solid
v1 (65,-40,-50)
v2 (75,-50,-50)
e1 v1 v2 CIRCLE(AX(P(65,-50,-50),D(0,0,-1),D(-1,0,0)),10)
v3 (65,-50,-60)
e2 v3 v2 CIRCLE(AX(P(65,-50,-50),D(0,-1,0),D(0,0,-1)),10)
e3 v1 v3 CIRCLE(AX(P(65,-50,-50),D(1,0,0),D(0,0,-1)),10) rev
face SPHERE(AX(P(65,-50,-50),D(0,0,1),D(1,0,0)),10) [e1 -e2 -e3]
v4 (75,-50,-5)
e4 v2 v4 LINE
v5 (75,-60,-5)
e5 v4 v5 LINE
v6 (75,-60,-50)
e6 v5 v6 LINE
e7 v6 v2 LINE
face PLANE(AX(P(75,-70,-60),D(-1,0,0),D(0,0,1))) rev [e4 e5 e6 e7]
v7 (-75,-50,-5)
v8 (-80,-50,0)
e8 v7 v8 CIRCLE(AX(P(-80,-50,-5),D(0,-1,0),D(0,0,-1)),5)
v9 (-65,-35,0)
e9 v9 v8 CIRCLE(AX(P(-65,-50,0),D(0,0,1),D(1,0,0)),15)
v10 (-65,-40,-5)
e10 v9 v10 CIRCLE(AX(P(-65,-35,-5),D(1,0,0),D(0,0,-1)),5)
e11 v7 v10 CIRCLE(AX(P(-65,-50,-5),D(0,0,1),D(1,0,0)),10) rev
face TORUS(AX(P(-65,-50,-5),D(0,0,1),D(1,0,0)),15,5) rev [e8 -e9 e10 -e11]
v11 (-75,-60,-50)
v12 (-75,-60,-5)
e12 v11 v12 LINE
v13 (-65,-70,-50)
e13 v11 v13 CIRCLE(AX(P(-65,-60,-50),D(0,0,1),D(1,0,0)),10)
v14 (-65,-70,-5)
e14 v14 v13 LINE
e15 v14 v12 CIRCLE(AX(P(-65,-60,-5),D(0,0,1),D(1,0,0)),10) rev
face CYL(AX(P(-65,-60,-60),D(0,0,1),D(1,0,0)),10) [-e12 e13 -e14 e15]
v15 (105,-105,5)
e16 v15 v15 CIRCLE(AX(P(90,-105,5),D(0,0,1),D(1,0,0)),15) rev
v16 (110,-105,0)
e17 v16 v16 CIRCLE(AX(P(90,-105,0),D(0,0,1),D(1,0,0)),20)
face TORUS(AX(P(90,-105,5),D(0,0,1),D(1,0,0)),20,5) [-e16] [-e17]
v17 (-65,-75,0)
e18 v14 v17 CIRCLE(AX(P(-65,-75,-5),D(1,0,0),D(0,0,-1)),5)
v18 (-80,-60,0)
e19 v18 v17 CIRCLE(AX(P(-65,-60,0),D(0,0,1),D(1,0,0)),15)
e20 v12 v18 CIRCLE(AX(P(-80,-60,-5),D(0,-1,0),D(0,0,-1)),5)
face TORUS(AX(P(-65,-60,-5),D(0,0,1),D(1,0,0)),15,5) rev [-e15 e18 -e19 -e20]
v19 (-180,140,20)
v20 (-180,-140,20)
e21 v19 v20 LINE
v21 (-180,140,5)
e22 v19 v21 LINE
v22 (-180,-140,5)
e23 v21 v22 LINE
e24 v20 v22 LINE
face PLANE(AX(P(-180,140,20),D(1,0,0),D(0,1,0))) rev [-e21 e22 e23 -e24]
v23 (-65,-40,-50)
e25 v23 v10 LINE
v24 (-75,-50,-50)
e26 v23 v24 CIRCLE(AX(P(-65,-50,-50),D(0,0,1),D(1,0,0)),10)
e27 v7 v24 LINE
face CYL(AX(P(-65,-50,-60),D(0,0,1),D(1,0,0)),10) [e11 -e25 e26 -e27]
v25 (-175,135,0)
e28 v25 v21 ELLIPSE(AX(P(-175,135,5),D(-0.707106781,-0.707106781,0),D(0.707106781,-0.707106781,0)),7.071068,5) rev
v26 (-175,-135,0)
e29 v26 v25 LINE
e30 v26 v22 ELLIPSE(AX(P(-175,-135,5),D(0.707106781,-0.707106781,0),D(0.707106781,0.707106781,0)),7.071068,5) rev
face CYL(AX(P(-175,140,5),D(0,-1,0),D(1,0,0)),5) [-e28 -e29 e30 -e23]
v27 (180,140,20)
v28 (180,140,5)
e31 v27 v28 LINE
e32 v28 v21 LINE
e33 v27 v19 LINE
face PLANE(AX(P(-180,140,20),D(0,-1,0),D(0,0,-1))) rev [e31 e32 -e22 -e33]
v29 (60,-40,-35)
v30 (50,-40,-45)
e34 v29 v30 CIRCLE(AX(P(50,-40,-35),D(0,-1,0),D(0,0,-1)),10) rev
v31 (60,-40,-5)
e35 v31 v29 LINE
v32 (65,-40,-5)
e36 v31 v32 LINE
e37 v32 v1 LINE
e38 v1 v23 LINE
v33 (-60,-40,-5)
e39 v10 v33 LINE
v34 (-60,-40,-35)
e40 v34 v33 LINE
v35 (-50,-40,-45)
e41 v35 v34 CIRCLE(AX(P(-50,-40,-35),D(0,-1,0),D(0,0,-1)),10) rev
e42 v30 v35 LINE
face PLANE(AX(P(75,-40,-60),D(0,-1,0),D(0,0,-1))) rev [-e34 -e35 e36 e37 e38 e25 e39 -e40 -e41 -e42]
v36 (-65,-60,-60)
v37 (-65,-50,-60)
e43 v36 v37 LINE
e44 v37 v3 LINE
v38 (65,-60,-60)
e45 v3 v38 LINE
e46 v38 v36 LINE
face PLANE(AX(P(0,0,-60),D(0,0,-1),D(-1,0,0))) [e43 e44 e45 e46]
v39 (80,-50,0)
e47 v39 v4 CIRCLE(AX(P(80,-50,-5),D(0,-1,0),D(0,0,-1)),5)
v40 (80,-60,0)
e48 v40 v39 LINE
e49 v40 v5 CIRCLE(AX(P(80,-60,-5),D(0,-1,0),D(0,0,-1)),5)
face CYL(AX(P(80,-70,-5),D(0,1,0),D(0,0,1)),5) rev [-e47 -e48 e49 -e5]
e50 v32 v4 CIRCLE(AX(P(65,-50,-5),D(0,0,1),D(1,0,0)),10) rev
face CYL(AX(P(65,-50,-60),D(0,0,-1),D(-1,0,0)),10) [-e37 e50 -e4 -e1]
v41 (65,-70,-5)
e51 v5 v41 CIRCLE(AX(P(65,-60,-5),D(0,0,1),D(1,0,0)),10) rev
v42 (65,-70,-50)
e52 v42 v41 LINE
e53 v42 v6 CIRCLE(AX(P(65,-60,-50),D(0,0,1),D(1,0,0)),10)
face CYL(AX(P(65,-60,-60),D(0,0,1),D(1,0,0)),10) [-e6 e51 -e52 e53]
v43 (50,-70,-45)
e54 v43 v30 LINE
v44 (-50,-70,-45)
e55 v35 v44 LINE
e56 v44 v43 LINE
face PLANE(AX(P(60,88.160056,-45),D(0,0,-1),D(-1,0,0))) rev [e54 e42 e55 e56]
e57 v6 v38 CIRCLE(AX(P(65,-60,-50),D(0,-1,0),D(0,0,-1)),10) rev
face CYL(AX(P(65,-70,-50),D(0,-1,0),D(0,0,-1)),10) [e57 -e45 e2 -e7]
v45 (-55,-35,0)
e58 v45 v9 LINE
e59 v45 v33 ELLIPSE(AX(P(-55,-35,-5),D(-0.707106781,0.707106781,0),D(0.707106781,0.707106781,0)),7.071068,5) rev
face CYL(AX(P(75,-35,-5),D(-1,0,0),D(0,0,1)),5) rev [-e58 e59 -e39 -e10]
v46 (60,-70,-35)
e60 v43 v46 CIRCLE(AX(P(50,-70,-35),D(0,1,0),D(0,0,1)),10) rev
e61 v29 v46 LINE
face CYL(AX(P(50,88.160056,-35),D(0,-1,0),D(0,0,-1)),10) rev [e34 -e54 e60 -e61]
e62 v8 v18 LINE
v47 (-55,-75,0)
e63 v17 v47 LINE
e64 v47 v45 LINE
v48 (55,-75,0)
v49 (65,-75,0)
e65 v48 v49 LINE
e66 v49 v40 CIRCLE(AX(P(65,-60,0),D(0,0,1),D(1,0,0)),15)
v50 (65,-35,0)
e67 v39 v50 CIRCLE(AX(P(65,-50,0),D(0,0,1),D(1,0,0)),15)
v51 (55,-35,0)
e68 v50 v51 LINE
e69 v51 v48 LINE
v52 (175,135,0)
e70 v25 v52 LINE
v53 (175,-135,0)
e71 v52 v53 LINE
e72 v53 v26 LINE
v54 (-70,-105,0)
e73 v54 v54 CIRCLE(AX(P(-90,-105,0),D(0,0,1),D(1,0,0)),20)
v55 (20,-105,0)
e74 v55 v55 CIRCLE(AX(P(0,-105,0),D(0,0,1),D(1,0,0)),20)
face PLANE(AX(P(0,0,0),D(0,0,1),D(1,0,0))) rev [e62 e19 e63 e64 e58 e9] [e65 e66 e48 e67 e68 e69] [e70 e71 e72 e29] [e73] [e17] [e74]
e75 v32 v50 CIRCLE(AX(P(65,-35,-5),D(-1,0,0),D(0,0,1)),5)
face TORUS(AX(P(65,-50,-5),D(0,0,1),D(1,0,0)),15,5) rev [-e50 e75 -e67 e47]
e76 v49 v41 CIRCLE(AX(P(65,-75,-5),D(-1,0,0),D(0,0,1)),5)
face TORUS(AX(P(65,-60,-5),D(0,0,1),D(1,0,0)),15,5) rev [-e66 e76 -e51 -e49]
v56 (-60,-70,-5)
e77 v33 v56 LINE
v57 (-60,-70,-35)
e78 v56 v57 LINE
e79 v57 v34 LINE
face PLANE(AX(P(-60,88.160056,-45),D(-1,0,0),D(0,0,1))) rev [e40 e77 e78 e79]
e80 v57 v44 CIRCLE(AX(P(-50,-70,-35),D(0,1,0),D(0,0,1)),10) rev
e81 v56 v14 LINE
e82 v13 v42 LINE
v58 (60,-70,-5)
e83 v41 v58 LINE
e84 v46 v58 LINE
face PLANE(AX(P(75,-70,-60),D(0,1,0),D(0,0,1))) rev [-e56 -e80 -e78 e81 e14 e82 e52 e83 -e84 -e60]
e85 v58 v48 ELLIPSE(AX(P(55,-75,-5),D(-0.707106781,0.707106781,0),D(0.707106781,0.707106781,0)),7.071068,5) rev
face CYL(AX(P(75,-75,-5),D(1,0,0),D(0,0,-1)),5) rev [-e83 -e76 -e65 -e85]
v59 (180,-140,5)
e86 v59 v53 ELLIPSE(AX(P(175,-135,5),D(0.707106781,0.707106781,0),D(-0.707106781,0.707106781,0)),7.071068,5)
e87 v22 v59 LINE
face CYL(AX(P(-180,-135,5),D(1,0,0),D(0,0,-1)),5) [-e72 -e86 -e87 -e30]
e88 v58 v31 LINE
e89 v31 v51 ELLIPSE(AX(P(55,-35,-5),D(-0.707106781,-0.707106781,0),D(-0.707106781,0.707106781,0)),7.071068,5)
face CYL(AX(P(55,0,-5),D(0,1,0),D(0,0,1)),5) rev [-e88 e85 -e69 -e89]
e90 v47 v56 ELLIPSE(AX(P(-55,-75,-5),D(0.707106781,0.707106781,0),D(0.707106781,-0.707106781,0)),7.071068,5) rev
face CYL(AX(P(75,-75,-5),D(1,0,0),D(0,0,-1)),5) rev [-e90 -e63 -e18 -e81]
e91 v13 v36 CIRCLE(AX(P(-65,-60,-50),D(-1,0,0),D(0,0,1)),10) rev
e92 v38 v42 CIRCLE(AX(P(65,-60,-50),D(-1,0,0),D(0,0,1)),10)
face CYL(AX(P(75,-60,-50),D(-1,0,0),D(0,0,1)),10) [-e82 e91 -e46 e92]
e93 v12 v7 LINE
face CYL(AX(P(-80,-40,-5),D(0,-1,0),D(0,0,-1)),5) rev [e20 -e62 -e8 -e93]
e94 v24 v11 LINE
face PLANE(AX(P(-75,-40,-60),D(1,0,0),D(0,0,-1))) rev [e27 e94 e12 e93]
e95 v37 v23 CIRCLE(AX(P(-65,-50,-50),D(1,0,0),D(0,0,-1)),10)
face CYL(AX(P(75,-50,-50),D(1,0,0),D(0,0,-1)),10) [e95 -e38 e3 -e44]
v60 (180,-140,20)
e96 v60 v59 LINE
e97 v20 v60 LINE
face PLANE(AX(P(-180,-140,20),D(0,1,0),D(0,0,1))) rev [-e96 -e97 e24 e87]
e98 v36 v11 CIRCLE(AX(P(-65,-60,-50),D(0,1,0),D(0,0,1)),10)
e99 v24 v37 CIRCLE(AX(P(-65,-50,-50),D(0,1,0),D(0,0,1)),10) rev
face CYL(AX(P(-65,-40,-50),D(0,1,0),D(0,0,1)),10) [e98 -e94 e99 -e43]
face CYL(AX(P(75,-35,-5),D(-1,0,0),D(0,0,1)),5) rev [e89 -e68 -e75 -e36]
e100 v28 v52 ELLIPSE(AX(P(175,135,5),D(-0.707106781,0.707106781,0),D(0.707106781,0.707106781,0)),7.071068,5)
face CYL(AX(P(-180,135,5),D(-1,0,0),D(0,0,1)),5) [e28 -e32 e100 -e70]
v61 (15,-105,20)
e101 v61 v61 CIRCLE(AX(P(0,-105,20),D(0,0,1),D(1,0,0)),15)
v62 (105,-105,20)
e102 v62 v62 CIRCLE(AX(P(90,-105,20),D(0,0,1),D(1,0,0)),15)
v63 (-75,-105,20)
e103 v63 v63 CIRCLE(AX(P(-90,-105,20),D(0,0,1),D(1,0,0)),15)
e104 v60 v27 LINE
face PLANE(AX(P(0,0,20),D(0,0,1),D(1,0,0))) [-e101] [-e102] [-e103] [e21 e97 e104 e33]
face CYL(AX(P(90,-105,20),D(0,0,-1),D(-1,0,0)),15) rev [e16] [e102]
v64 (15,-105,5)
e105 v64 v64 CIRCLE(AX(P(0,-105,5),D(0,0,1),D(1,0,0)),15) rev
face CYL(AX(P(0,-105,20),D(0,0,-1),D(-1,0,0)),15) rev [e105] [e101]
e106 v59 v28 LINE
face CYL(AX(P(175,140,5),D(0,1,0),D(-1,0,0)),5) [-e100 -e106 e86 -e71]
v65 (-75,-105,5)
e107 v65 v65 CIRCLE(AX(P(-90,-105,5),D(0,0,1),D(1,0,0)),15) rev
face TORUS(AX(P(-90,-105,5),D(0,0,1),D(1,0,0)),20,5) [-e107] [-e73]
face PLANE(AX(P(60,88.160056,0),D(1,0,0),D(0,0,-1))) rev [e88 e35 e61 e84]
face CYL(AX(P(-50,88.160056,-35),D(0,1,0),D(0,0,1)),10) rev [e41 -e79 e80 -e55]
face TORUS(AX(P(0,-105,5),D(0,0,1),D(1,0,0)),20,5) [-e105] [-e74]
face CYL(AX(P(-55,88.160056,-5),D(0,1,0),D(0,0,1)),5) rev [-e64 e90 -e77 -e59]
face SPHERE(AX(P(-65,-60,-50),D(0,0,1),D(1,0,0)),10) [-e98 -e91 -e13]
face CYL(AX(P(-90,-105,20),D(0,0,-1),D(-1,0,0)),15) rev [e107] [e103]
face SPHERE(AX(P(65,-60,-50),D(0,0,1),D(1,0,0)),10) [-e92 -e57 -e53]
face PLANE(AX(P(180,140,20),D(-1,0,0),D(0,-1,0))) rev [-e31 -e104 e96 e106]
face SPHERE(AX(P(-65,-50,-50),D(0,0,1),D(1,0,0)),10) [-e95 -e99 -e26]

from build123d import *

# Parameters (mm, degrees)
SCHIZZO1_W                   = 360
SCHIZZO1_H                   = 280
SCHIZZO1_R                   = 15
ESTRUSIONE_ESTRUSIONE1_DEPTH = 20
SCHIZZO2_W                   = 150
SCHIZZO2_H                   = 30
ESTRUSIONE_ESTRUSIONE2_DEPTH = 60
SCHIZZO3_W                   = 120
SCHIZZO3_H                   = 45
TAGLIO_ESTRUSIONE2_DEPTH     = 30
RACCORDO2_R                  = 10
RACCORDO3_R                  = 10
RACCORDO4_R                  = 10
RACCORDO5_R                  = 10
RACCORDO6_R                  = 10
RACCORDO7_R                  = 10
RACCORDO8_R                  = 10
RACCORDO12_R                 = 5


with BuildPart() as part:
    # Schizzo1 → Estrusione-Estrusione1 (new body)
    with BuildSketch(Plane.XY):
        Rectangle(SCHIZZO1_W, SCHIZZO1_H)
        with Locations((-90, -105)):
            Circle(SCHIZZO1_R, mode=Mode.SUBTRACT)
        with Locations((90, -105)):
            Circle(SCHIZZO1_R, mode=Mode.SUBTRACT)
        with Locations((0, -105)):
            Circle(SCHIZZO1_R, mode=Mode.SUBTRACT)
    extrude(amount=ESTRUSIONE_ESTRUSIONE1_DEPTH)

    # Schizzo2 → Estrusione-Estrusione2 (add)
    with BuildSketch(Plane(origin=(0, 0, 0), x_dir=(-1, 0, 0), z_dir=(0, 0, -1))):
        with Locations((0, -55)):
            Rectangle(SCHIZZO2_W, SCHIZZO2_H)
    extrude(amount=ESTRUSIONE_ESTRUSIONE2_DEPTH)

    # Schizzo3 → Taglio-Estrusione2 (cut)
    with BuildSketch(Plane.XZ.offset(70)):
        with Locations((0, -22.5)):
            Rectangle(SCHIZZO3_W, SCHIZZO3_H)
    extrude(amount=-TAGLIO_ESTRUSIONE2_DEPTH, mode=Mode.SUBTRACT)

    # Raccordo2
    raccordo2_edges = [part.edges().sort_by_distance(p)[0] for p in [
        (-75, -55, -60),
        (0, -40, -60),
        (75, -55, -60),
        (0, -70, -60),
    ]]
    fillet(raccordo2_edges, radius=RACCORDO2_R)

    # Raccordo3
    raccordo3_edges = [part.edges().sort_by_distance(p)[0] for p in [
        (60, -55, -45),
    ]]
    fillet(raccordo3_edges, radius=RACCORDO3_R)

    # Raccordo4
    raccordo4_edges = [part.edges().sort_by_distance(p)[0] for p in [
        (-60, -55, -45),
    ]]
    fillet(raccordo4_edges, radius=RACCORDO4_R)

    # Raccordo5
    # the kernel refuses this fillet: 10 mm, written as the material it takes off along each edge
    with BuildSketch(Plane(origin=(65, -60, -50), x_dir=(1, 0, 0), z_dir=(0, -1, 0))) as raccordo5_piece_1_section:
        Polygon((0, 0), (RACCORDO5_R, 0), (RACCORDO5_R, -RACCORDO5_R), (0, -RACCORDO5_R), align=None)
    raccordo5_piece_1 = extrude(amount=RACCORDO5_R, mode=Mode.PRIVATE)
    raccordo5_piece_1 = raccordo5_piece_1 - Plane(origin=(65, -60, -50), x_dir=(-0.7071067811865475, 0, 0.7071067811865475), z_dir=(0, -1, 0)) * Sphere(RACCORDO5_R, mode=Mode.PRIVATE)
    add(raccordo5_piece_1, mode=Mode.SUBTRACT)
    with BuildSketch(Plane(origin=(75, -70, 0), x_dir=(-1, 0, 0), z_dir=(0, 0, -1))) as raccordo5_piece_2:
        with BuildLine():
            CenterArc((RACCORDO5_R, RACCORDO5_R), RACCORDO5_R, 180, 90)
            Line((0, RACCORDO5_R), (0, 0))
            Line((0, 0), (RACCORDO5_R, 0))
        make_face()
    extrude(amount=50, mode=Mode.SUBTRACT)

    # Raccordo6
    # the kernel refuses this fillet: 10 mm, written as the material it takes off along each edge
    with BuildSketch(Plane(origin=(-65, -50, -50), x_dir=(0, 1, 0), z_dir=(-1, 0, 0))) as raccordo6_piece_1_section:
        Polygon((0, 0), (RACCORDO6_R, 0), (RACCORDO6_R, RACCORDO6_R), (0, RACCORDO6_R), align=None)
    raccordo6_piece_1 = extrude(amount=RACCORDO6_R, mode=Mode.PRIVATE)
    raccordo6_piece_1 = raccordo6_piece_1 - Plane(origin=(-65, -50, -50), x_dir=(0, -0.7071067811865475, 0.7071067811865475), z_dir=(-1, 0, 0)) * Sphere(RACCORDO6_R, mode=Mode.PRIVATE)
    add(raccordo6_piece_1, mode=Mode.SUBTRACT)
    with BuildSketch(Plane(origin=(-75, -40, 0), x_dir=(0, -1, 0), z_dir=(0, 0, -1))) as raccordo6_piece_2:
        with BuildLine():
            CenterArc((RACCORDO6_R, -RACCORDO6_R), RACCORDO6_R, 90, 90)
            Line((0, -RACCORDO6_R), (0, 0))
            Line((0, 0), (RACCORDO6_R, 0))
        make_face()
    extrude(amount=50, mode=Mode.SUBTRACT)

    # Raccordo7
    # the kernel refuses this fillet: 10 mm, written as the material it takes off along each edge
    with BuildSketch(Plane(origin=(65, -50, -50), x_dir=(1, 0, 0), z_dir=(0, 1, 0))) as raccordo7_piece_1_section:
        Polygon((0, 0), (RACCORDO7_R, 0), (RACCORDO7_R, RACCORDO7_R), (0, RACCORDO7_R), align=None)
    raccordo7_piece_1 = extrude(amount=RACCORDO7_R, mode=Mode.PRIVATE)
    raccordo7_piece_1 = raccordo7_piece_1 - Plane(origin=(65, -50, -50), x_dir=(-0.7071067811865475, 0, 0.7071067811865475), z_dir=(0, 1, 0)) * Sphere(RACCORDO7_R, mode=Mode.PRIVATE)
    add(raccordo7_piece_1, mode=Mode.SUBTRACT)
    with BuildSketch(Plane(origin=(75, -40, 0), x_dir=(-1, 0, 0), z_dir=(0, 0, -1))) as raccordo7_piece_2:
        with BuildLine():
            CenterArc((RACCORDO7_R, -RACCORDO7_R), RACCORDO7_R, 90, 90)
            Line((0, -RACCORDO7_R), (0, 0))
            Line((0, 0), (RACCORDO7_R, 0))
        make_face()
    extrude(amount=50, mode=Mode.SUBTRACT)

    # Raccordo8
    # the kernel refuses this fillet: 10 mm, written as the material it takes off along each edge
    with BuildSketch(Plane(origin=(-65, -60, -50), x_dir=(-1, 0, 0), z_dir=(0, -1, 0))) as raccordo8_piece_1_section:
        Polygon((0, 0), (RACCORDO8_R, 0), (RACCORDO8_R, RACCORDO8_R), (0, RACCORDO8_R), align=None)
    raccordo8_piece_1 = extrude(amount=RACCORDO8_R, mode=Mode.PRIVATE)
    raccordo8_piece_1 = raccordo8_piece_1 - Plane(origin=(-65, -60, -50), x_dir=(0.7071067811865475, 0, 0.7071067811865475), z_dir=(0, -1, 0)) * Sphere(RACCORDO8_R, mode=Mode.PRIVATE)
    add(raccordo8_piece_1, mode=Mode.SUBTRACT)
    with BuildSketch(Plane(origin=(-75, -70, 0), x_dir=(1, 0, 0), z_dir=(0, 0, -1))) as raccordo8_piece_2:
        with BuildLine():
            CenterArc((RACCORDO8_R, -RACCORDO8_R), RACCORDO8_R, 90, 90)
            Line((0, -RACCORDO8_R), (0, 0))
            Line((0, 0), (RACCORDO8_R, 0))
        make_face()
    extrude(amount=50, mode=Mode.SUBTRACT)

    # Raccordo12
    raccordo12_edges = [part.edges().sort_by_distance(p)[0] for p in [
        (72.071067812, -67.071067812, 0),
        (-62.5, -40, 0),
        (-72.071067812, -42.928932188, 0),
        (75, -55, 0),
        (72.071067812, -42.928932188, 0),
        (-105, -105, 0),
        (-75, -55, 0),
        (-72.071067812, -67.071067812, 0),
        (75, -105, 0),
        (-15, -105, 0),
        (-62.5, -70, 0),
        (62.5, -40, 0),
        (60, -55, 0),
        (-60, -55, 0),
        (0, -140, 0),
        (-180, 0, 0),
        (0, 140, 0),
        (180, 0, 0),
        (62.5, -70, 0),
    ]]
    fillet(raccordo12_edges, radius=RACCORDO12_R)


solid = part.part
